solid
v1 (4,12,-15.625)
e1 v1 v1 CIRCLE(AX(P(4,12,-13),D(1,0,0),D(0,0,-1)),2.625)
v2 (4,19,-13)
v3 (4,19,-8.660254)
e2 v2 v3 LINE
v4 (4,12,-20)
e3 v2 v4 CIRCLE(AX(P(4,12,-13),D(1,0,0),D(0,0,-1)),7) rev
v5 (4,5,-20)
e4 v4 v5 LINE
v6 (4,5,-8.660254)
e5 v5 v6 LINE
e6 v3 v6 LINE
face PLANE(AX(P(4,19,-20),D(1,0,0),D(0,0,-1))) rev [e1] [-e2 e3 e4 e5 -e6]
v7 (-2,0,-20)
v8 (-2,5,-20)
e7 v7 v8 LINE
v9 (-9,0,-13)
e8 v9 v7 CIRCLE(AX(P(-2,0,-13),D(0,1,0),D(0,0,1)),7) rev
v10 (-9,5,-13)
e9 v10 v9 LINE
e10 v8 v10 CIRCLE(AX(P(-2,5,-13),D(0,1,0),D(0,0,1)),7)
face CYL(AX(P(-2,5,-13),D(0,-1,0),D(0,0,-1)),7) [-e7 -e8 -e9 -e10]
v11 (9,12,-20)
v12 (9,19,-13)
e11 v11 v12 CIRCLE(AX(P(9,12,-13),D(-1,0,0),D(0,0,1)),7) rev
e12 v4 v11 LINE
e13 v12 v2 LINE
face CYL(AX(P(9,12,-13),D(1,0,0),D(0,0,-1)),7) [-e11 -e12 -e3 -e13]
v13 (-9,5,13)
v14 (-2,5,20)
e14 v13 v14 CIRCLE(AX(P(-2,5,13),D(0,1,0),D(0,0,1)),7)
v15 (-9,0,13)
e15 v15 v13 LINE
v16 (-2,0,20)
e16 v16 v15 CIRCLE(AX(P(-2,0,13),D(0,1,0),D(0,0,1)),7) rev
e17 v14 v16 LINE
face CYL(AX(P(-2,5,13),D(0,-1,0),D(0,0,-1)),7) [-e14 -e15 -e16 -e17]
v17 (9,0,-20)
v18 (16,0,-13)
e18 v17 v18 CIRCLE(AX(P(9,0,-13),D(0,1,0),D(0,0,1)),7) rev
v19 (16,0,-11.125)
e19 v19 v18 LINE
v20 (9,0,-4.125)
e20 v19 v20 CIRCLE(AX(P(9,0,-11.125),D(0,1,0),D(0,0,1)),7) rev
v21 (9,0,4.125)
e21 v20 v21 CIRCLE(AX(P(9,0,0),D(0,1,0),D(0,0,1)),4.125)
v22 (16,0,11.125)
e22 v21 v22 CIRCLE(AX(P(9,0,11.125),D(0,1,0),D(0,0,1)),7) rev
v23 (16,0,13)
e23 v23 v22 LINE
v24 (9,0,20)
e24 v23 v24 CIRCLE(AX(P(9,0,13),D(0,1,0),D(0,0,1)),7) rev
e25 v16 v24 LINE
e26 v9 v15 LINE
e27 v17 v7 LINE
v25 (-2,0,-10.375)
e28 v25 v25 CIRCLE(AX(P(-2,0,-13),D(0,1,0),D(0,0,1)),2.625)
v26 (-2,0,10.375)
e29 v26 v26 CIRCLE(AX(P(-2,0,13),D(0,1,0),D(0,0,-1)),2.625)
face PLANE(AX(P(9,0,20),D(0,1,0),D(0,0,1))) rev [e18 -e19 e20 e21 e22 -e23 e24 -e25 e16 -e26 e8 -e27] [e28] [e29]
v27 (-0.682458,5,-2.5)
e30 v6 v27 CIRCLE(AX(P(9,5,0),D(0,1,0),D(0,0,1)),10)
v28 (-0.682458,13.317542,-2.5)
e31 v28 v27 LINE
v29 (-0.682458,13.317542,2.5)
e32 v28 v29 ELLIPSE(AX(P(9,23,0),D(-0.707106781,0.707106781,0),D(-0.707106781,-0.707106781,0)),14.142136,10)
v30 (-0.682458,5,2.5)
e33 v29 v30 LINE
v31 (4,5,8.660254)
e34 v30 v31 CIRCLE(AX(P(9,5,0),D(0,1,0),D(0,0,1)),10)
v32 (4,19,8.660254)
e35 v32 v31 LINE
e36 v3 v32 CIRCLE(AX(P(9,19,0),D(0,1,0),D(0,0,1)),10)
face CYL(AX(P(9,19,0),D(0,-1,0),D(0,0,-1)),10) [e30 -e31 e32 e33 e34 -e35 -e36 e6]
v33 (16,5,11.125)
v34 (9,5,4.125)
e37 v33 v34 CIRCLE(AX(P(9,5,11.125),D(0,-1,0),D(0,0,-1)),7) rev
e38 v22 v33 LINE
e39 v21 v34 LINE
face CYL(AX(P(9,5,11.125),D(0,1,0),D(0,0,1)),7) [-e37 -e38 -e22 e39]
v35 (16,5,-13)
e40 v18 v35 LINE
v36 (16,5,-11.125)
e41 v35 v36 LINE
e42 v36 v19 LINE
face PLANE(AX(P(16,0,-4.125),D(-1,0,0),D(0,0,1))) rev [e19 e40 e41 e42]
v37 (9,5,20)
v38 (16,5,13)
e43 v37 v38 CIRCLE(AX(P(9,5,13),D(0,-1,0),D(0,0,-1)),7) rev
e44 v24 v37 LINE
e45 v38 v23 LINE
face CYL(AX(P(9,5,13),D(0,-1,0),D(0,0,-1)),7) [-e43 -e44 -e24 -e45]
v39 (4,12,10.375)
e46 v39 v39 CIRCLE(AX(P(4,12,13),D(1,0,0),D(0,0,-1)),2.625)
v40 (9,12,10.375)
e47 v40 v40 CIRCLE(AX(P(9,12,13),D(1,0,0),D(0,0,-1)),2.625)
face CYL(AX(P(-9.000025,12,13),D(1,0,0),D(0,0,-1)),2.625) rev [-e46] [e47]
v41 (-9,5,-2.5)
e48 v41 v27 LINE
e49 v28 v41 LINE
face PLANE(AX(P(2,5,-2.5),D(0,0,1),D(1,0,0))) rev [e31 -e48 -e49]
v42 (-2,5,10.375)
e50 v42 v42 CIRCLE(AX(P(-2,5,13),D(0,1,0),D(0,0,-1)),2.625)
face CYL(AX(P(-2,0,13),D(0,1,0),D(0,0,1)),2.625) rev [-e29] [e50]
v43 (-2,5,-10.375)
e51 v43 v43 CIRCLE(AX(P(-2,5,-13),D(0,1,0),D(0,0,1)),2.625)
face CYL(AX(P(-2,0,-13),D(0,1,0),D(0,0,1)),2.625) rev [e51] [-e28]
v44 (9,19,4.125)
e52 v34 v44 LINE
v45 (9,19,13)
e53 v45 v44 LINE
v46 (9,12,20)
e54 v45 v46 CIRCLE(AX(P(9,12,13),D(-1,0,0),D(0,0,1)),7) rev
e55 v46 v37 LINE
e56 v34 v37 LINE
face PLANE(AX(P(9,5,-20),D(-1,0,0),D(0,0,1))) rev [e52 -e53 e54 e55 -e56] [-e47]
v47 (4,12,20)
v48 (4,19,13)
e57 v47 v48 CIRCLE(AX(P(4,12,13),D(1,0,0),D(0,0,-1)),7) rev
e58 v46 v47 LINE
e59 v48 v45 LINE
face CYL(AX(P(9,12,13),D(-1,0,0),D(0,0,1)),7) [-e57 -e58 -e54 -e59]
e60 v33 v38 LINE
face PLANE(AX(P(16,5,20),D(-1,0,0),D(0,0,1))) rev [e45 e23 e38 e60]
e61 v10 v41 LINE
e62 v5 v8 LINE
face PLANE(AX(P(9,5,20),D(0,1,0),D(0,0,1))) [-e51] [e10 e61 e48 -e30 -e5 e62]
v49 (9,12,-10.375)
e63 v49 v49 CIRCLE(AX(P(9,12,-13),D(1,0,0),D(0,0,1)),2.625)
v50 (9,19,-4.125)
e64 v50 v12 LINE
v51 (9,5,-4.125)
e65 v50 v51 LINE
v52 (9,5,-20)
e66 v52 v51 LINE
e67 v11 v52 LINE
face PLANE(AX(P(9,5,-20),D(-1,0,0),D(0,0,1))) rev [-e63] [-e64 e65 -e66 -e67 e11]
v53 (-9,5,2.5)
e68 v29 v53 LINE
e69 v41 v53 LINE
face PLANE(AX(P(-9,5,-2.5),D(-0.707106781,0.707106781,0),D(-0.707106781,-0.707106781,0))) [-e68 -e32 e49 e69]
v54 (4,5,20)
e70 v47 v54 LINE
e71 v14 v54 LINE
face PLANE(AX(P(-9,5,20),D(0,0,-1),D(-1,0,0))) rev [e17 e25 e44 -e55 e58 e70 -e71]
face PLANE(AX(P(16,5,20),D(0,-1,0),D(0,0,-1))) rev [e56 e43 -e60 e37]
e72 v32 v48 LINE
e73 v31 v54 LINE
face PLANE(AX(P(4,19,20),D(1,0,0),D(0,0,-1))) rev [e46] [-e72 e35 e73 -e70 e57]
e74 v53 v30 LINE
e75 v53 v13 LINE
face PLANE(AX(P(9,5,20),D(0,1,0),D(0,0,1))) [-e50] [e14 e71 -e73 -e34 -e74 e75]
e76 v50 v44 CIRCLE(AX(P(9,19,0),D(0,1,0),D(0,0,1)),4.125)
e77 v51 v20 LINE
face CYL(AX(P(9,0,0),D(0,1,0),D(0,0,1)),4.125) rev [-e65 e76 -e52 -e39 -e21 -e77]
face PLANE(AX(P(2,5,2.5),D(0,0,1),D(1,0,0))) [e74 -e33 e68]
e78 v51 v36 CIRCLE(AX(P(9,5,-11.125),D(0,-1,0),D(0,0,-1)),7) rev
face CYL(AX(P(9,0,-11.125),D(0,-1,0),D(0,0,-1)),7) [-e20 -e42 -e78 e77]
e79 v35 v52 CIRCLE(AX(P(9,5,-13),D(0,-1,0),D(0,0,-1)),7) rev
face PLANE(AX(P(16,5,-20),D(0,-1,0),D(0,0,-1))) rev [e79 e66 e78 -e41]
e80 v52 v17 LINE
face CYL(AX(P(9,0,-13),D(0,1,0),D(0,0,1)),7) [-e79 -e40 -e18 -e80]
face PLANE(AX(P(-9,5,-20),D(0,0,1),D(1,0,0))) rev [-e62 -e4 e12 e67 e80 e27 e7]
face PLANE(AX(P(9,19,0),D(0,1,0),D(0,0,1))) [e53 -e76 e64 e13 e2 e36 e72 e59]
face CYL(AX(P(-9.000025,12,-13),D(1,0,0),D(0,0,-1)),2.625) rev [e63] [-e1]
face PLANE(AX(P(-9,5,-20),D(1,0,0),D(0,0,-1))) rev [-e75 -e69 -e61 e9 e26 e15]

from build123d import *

# Parameters (mm, degrees)
SKETCH1_W                = 18
SKETCH1_H                = 40
BOSS_EXTRUDE1_DEPTH      = 5
BOSS_EXTRUDE2_DEPTH      = 14
SKETCH3_R                = 4.125
CUT_EXTRUDE1_DEPTH       = 30.017236257
FILLET1_R                = 7
SKETCH6_R                = 2.625
CUT_EXTRUDE3_DEPTH       = 33.939338184
SKETCH7_W                = 15.875
SKETCH7_H                = 5
BOSS_EXTRUDE3_DEPTH      = 7
FILLET2_R                = 7
SKETCH8_R                = 2.625
CUT_EXTRUDE4_DEPTH       = 30.189039039
BOSS_EXTRUDE4_DEPTH      = 2.5
BOSS_EXTRUDE4_DEPTH_BACK = 2.5


with BuildPart() as part:
    # Sketch1 → Boss-Extrude1 (new body)
    with BuildSketch(Plane(origin=(0, 0, 0), x_dir=(1, 0, 0), z_dir=(0, 1, 0))):
        Rectangle(SKETCH1_W, SKETCH1_H)
    extrude(amount=BOSS_EXTRUDE1_DEPTH)

    # Sketch2 → Boss-Extrude2 (add)
    with BuildSketch(Plane(origin=(0, 5, 0), x_dir=(1, 0, 0), z_dir=(0, 1, 0))):
        with BuildLine():
            Line((4, -20), (4, -8.660254038))
            ThreePointArc((4, -8.660254038), (-1, 0), (4, 8.660254038))
            Line((4, 8.660254038), (4, 20))
            Line((4, 20), (9, 20))
            Line((9, 20), (9, -20))
            Line((9, -20), (4, -20))
        make_face()
    extrude(amount=BOSS_EXTRUDE2_DEPTH)

    # Sketch3 → Cut-Extrude1 (cut, through all)
    with BuildSketch(Plane(origin=(0, 19, 0), x_dir=(1, 0, 0), z_dir=(0, 1, 0))):
        with Locations((9, 0)):
            Circle(SKETCH3_R)
    extrude(amount=-CUT_EXTRUDE1_DEPTH, mode=Mode.SUBTRACT)

    # Fillet1
    fillet1_edges = [part.edges().sort_by_distance(p)[0] for p in [
        (6.5, 19, 20),
        (6.5, 19, -20),
    ]]
    fillet(fillet1_edges, radius=FILLET1_R)

    # Sketch6 → Cut-Extrude3 (cut, through all)
    with BuildSketch(Plane(origin=(9, 0, 0), x_dir=(0, 0, -1), z_dir=(1, 0, 0))):
        with Locations((-13, 12)):
            Circle(SKETCH6_R)
        with Locations((13, 12)):
            Circle(SKETCH6_R)
    extrude(amount=-CUT_EXTRUDE3_DEPTH, mode=Mode.SUBTRACT)

    # Sketch7 → Boss-Extrude3 (add)
    with BuildSketch(Plane(origin=(9, 0, 0), x_dir=(0, 0, -1), z_dir=(1, 0, 0))):
        with Locations((-12.0625, 2.5)):
            Rectangle(SKETCH7_W, SKETCH7_H)
        with Locations((12.0625, 2.5)):
            Rectangle(SKETCH7_W, SKETCH7_H)
    extrude(amount=BOSS_EXTRUDE3_DEPTH)

    # Fillet2
    fillet2_edges = [part.edges().sort_by_distance(p)[0] for p in [
        (-9, 2.5, -20),
        (16, 2.5, -20),
        (16, 2.5, 20),
        (-9, 2.5, 20),
        (16, 2.5, -4.125),
        (16, 2.5, 4.125),
    ]]
    fillet(fillet2_edges, radius=FILLET2_R - 0.0001)  # a hair under: the kernel refuses the full size

    # Sketch8 → Cut-Extrude4 (cut, through all)
    with BuildSketch(Plane(origin=(0, 5, 0), x_dir=(1, 0, 0), z_dir=(0, 1, 0))):
        with Locations(Location((-2, 13, 0), (0, 0, 270))):
            Circle(SKETCH8_R)
        with Locations(Location((-2, -13, 0), (0, 0, 90))):
            Circle(SKETCH8_R)
    extrude(amount=-CUT_EXTRUDE4_DEPTH, mode=Mode.SUBTRACT)

    # Sketch9 → Boss-Extrude4 (add, two sides: drawn at the far end of the back side and taken through both)
    with BuildSketch(Plane.XY.offset(-BOSS_EXTRUDE4_DEPTH_BACK)):
        Polygon((-9, 5), (2, 16), (2, 5), align=None)
    extrude(amount=BOSS_EXTRUDE4_DEPTH + BOSS_EXTRUDE4_DEPTH_BACK)


solid = part.part
